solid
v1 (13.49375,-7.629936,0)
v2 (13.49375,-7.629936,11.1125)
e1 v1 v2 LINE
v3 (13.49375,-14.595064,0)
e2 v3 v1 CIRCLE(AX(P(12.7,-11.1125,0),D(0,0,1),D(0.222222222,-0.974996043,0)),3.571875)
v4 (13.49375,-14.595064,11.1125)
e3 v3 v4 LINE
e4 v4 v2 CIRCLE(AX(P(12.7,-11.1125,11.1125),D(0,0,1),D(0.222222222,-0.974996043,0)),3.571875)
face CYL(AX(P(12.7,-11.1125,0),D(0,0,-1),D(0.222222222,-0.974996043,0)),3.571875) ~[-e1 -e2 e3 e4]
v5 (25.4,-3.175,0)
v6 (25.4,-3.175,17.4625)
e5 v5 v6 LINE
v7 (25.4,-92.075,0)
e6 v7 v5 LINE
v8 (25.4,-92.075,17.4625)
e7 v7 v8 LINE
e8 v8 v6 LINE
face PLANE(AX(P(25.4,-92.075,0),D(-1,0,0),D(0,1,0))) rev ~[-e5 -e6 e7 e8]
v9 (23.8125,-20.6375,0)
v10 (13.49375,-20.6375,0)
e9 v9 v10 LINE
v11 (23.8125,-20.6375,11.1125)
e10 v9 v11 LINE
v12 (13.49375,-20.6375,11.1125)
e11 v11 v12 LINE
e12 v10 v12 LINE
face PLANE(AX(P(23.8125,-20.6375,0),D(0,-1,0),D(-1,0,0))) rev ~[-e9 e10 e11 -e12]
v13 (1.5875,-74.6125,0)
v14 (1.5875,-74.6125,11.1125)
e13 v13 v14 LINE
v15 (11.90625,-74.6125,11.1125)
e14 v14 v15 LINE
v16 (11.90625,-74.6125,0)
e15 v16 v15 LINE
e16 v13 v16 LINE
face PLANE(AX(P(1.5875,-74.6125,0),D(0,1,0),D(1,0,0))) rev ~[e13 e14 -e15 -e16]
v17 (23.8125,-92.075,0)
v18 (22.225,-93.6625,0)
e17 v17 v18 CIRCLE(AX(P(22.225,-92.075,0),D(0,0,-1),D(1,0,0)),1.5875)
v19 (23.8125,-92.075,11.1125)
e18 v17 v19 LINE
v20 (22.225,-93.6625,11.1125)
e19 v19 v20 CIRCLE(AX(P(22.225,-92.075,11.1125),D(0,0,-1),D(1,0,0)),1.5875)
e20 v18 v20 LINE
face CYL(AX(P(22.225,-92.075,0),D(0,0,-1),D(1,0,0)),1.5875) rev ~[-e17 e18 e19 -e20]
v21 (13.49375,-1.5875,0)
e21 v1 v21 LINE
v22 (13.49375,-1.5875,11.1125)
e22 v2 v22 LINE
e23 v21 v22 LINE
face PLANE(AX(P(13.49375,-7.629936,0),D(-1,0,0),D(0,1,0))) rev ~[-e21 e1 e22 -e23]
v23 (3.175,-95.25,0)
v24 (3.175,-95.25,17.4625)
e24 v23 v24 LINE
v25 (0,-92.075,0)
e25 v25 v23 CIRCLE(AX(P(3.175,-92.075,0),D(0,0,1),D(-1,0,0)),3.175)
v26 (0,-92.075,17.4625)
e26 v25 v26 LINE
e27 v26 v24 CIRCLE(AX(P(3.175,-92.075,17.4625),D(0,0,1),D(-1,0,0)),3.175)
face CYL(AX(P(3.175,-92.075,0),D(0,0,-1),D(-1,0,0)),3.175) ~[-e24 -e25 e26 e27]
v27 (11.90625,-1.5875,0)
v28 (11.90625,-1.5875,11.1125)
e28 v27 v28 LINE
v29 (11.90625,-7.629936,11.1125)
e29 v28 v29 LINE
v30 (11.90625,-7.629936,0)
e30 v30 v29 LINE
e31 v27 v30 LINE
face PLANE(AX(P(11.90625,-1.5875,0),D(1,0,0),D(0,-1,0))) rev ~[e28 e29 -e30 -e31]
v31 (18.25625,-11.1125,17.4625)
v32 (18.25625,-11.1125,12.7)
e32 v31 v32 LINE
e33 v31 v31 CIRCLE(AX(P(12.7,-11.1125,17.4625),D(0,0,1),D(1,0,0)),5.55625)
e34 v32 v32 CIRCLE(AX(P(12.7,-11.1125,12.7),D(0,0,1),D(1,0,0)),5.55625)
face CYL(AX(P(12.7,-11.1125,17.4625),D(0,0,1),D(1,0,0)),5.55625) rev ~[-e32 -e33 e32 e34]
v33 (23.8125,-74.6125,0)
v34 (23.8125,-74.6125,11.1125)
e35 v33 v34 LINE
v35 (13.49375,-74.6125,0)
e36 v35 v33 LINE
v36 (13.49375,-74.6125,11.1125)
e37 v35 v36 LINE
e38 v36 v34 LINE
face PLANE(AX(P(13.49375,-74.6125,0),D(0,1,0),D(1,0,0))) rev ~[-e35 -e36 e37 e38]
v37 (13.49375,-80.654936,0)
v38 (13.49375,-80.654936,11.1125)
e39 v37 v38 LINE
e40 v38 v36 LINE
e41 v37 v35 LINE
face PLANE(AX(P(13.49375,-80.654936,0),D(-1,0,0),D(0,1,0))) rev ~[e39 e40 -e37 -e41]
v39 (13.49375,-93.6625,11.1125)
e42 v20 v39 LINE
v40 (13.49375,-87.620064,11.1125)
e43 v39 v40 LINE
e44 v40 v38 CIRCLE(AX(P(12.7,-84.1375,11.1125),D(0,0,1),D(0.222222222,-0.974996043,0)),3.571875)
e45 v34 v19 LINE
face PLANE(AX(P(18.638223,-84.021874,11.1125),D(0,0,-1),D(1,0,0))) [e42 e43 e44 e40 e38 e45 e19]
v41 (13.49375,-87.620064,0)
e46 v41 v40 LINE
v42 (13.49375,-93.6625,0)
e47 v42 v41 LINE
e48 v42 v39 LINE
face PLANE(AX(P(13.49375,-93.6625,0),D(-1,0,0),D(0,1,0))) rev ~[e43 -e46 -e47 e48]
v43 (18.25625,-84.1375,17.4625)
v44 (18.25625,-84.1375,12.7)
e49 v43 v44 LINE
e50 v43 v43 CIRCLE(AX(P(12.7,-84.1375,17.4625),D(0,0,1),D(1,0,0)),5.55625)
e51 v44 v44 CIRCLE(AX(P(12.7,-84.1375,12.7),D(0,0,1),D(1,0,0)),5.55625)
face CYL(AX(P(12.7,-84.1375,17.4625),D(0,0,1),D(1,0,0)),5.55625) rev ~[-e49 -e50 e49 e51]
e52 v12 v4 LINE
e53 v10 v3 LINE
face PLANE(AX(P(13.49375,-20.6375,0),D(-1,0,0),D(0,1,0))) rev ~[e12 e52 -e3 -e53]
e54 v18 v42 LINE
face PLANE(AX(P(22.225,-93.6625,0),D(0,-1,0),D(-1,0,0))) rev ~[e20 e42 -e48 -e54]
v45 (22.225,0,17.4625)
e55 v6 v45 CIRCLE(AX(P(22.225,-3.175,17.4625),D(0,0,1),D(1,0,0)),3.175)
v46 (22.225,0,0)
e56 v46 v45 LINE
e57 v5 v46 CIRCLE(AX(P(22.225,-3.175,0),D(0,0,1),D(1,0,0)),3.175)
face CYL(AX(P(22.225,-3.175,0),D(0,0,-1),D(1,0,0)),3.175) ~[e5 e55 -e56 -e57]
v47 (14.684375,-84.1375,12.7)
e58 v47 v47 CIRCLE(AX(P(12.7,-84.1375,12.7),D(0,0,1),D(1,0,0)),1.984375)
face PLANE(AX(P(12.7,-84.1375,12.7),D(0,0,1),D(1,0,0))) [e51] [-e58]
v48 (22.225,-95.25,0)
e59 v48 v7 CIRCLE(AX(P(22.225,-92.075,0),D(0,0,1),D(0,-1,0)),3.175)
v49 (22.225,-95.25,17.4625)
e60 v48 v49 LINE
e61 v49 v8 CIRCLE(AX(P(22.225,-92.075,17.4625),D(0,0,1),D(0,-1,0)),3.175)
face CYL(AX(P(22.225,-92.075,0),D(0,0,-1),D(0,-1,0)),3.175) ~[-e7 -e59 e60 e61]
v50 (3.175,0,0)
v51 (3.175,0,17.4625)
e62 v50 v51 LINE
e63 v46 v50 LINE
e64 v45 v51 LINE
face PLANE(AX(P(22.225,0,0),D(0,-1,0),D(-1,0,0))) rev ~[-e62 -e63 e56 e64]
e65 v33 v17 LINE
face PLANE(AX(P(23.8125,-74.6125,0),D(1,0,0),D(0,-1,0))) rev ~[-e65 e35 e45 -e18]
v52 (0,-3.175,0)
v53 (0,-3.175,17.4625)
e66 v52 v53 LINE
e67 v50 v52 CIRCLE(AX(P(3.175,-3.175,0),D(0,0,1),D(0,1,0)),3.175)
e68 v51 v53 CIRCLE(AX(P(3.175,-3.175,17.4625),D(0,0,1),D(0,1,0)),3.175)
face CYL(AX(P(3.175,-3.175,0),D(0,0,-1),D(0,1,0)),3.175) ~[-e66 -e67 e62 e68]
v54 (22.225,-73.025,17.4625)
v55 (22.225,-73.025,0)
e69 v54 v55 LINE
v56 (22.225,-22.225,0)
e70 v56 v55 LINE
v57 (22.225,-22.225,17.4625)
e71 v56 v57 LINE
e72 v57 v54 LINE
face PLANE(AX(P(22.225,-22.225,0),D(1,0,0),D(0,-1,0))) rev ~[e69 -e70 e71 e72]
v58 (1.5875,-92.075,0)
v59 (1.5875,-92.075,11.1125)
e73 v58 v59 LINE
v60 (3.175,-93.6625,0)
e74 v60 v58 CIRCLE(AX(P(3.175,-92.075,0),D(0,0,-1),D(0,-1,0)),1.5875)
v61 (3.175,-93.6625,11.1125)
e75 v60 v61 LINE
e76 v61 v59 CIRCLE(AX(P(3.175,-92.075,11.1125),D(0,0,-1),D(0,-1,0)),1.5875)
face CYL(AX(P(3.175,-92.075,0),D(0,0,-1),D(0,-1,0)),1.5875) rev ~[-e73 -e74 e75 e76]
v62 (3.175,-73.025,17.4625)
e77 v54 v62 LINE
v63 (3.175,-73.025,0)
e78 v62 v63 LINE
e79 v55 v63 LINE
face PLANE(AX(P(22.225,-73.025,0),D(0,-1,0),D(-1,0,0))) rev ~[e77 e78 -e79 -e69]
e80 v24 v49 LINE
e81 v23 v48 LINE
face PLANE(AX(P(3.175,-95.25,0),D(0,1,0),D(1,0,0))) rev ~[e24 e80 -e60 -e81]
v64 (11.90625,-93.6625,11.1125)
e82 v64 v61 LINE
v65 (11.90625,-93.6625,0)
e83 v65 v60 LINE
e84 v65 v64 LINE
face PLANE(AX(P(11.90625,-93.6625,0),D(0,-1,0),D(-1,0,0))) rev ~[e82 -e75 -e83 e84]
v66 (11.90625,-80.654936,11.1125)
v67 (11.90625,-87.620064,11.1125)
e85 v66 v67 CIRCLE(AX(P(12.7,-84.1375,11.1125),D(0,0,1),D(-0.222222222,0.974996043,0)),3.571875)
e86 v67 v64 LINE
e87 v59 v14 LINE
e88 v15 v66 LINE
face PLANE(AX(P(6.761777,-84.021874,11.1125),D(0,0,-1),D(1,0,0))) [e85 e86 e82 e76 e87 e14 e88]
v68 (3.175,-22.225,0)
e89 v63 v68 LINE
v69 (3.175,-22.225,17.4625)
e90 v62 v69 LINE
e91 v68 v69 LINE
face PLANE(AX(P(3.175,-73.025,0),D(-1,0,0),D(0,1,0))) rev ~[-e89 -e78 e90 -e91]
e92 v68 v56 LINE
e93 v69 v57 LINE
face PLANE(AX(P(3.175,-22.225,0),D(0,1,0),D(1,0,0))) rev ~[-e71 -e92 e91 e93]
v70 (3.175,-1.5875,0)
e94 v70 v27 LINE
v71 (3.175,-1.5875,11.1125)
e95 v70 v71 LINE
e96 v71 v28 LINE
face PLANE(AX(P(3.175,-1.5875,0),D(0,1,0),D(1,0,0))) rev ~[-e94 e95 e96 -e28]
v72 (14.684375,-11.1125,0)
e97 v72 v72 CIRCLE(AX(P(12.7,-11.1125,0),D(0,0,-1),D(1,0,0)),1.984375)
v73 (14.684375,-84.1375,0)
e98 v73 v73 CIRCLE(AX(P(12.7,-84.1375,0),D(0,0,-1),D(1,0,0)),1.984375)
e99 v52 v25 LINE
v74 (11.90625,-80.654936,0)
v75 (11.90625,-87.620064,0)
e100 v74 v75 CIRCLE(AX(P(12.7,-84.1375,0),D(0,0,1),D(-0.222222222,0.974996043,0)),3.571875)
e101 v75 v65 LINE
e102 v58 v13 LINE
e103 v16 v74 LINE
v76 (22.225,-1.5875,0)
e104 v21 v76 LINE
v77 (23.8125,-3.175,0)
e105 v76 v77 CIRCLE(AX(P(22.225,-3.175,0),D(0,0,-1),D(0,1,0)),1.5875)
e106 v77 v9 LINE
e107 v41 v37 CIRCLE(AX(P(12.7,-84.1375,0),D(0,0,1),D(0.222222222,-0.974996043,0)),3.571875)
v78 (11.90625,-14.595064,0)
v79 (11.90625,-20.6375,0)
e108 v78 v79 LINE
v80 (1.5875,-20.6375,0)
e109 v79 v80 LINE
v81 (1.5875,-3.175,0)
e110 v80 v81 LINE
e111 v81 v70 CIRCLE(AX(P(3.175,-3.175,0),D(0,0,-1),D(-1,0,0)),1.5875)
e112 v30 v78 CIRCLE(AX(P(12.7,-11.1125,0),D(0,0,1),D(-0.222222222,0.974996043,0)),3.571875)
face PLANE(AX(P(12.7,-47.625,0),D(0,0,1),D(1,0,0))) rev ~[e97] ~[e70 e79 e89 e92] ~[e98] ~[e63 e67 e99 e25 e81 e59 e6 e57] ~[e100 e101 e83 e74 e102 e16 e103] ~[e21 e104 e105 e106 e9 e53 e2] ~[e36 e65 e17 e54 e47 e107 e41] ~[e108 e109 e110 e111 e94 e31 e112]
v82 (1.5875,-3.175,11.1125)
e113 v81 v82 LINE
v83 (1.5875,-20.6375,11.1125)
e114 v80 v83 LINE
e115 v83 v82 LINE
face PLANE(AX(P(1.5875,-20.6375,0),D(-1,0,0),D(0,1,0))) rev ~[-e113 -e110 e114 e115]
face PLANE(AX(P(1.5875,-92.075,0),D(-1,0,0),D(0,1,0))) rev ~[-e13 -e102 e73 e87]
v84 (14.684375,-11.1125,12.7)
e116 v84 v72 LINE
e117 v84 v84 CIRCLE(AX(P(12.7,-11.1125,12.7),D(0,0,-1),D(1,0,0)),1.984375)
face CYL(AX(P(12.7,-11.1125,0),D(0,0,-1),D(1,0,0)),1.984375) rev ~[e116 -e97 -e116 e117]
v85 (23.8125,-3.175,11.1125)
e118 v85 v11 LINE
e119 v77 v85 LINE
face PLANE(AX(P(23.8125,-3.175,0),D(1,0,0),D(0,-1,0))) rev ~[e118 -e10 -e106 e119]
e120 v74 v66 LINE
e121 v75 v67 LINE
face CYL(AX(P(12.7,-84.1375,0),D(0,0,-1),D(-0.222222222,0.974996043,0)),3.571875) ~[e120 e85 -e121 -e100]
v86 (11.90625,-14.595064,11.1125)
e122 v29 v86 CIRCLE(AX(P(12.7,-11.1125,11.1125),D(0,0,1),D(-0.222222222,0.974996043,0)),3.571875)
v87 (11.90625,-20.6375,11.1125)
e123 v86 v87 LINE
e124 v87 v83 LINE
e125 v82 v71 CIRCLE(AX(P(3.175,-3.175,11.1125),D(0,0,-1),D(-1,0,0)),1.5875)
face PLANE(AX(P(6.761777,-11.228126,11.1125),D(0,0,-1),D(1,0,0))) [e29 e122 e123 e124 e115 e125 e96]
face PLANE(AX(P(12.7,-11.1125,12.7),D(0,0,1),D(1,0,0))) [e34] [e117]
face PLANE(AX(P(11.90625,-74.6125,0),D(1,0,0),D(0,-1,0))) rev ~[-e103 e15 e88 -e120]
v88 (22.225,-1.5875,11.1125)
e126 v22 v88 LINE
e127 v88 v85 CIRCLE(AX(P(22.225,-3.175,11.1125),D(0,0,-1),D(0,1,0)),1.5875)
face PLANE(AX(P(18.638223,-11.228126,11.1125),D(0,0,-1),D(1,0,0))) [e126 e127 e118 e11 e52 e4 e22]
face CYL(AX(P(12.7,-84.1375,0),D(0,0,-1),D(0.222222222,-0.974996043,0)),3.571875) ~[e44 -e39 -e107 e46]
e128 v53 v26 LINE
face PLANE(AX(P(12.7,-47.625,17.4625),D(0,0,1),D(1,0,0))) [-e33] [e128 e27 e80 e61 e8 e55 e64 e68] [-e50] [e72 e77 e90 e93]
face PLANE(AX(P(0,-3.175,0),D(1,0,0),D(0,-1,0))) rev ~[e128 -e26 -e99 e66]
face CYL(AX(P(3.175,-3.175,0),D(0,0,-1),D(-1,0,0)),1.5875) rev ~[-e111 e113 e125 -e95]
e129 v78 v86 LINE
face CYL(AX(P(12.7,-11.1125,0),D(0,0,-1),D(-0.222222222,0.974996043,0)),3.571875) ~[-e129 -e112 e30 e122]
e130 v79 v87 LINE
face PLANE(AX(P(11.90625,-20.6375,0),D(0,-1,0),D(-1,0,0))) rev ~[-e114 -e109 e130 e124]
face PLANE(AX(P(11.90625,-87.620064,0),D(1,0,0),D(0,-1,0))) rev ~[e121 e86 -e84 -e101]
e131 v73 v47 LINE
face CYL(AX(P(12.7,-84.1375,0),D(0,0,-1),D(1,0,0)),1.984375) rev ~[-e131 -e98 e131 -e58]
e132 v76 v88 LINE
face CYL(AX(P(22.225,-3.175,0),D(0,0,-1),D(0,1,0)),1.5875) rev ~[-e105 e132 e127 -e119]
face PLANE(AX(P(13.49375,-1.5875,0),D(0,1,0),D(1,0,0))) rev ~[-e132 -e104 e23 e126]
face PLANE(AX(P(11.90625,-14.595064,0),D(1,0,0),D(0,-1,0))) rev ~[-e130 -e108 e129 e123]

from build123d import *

# Parameters (mm, degrees)
F1_DEPTH = 17.4625
F3_R     = 1.984375
F4_DEPTH = 17.4635
F5_DEPTH = 3.175
F6_R     = 1.984375
F7_DEPTH = 11.1125
F8_R     = 5.55625
F8_R_2   = 1.984375
F9_DEPTH = 4.7625


with BuildPart() as f1:
    # F0 (on Top) → F1 (new body)
    with BuildSketch(Plane.XY):
        with BuildLine():
            Line((22.225, 0), (3.175, 0))
            ThreePointArc((3.175, 0), (0.9299359697, -0.9299359697), (0, -3.175))
            Line((0, -3.175), (0, -92.075))
            ThreePointArc((0, -92.075), (0.9299359697, -94.3200640303), (3.175, -95.25))
            Line((3.175, -95.25), (22.225, -95.25))
            ThreePointArc((22.225, -95.25), (24.4700640303, -94.3200640303), (25.4, -92.075))
            Line((25.4, -92.075), (25.4, -3.175))
            ThreePointArc((25.4, -3.175), (24.4700640303, -0.9299359697), (22.225, 0))
        make_face()
        Polygon((3.175, -22.225), (12.7, -22.225), (22.225, -22.225), (22.225, -47.625), (22.225, -73.025), (12.7, -73.025), (3.175, -73.025), (3.175, -47.625), align=None, mode=Mode.SUBTRACT)
    extrude(amount=F1_DEPTH)

    # F3 (on face) → F4 (cut, through all)
    with BuildSketch(Plane(origin=(0, 0, 0), x_dir=(1, 0, 0), z_dir=(0, 0, -1))):
        with Locations((12.7, 11.1125)):
            Circle(F3_R)
        with Locations((12.7, 84.1375)):
            Circle(F3_R)
    extrude(amount=-F4_DEPTH, mode=Mode.SUBTRACT)

    # F0 (on Top) → F5 (cut)
    with BuildSketch(Plane.XY):
        Polygon((22.225, -22.225), (12.7, -22.225), (3.175, -22.225), (3.175, -47.625), (3.175, -73.025), (12.7, -73.025), (22.225, -73.025), (22.225, -47.625), align=None)
    extrude(amount=F5_DEPTH, mode=Mode.SUBTRACT)

    # F6 (on face) → F7 (cut)
    with BuildSketch(Plane(origin=(0, 0, 0), x_dir=(1, 0, 0), z_dir=(0, 0, -1))):
        with BuildLine():
            ThreePointArc((11.90625, 80.6549360088), (9.128125, 84.1375), (11.90625, 87.6200639912))
            Line((11.90625, 87.6200639912), (11.90625, 93.6625))
            Line((11.90625, 93.6625), (3.175, 93.6625))
            ThreePointArc((3.175, 93.6625), (2.0524679849, 93.1975320151), (1.5875, 92.075))
            Line((1.5875, 92.075), (1.5875, 74.6125))
            Line((1.5875, 74.6125), (11.90625, 74.6125))
            Line((11.90625, 74.6125), (11.90625, 80.6549360088))
        make_face()
        with BuildLine():
            Line((22.225, 93.6625), (13.49375, 93.6625))
            Line((13.49375, 93.6625), (13.49375, 87.6200639912))
            ThreePointArc((13.49375, 87.6200639912), (16.271875, 84.1375), (13.49375, 80.6549360088))
            Line((13.49375, 80.6549360088), (13.49375, 74.6125))
            Line((13.49375, 74.6125), (23.8125, 74.6125))
            Line((23.8125, 74.6125), (23.8125, 92.075))
            ThreePointArc((23.8125, 92.075), (23.3475320151, 93.1975320151), (22.225, 93.6625))
        make_face()
        with BuildLine():
            Line((11.90625, 20.6375), (1.5875, 20.6375))
            Line((1.5875, 20.6375), (1.5875, 3.175))
            ThreePointArc((1.5875, 3.175), (2.0524679849, 2.0524679849), (3.175, 1.5875))
            Line((3.175, 1.5875), (11.90625, 1.5875))
            Line((11.90625, 1.5875), (11.90625, 7.6299360088))
            ThreePointArc((11.90625, 7.6299360088), (9.128125, 11.1125), (11.90625, 14.5950639912))
            Line((11.90625, 14.5950639912), (11.90625, 20.6375))
        make_face()
        with BuildLine():
            Line((23.8125, 3.175), (23.8125, 20.6375))
            Line((23.8125, 20.6375), (13.49375, 20.6375))
            Line((13.49375, 20.6375), (13.49375, 14.5950639912))
            ThreePointArc((13.49375, 14.5950639912), (16.271875, 11.1125), (13.49375, 7.6299360088))
            Line((13.49375, 7.6299360088), (13.49375, 1.5875))
            Line((13.49375, 1.5875), (22.225, 1.5875))
            ThreePointArc((22.225, 1.5875), (23.3475320151, 2.0524679849), (23.8125, 3.175))
        make_face()
        with Locations((12.7, 11.1125)):
            Circle(F6_R)
    extrude(amount=-F7_DEPTH, mode=Mode.SUBTRACT)

    # F8 (on face) → F9 (cut)
    with BuildSketch(Plane.XY.offset(17.4625)):
        with Locations((12.7, -84.1375)):
            Circle(F8_R)
        with Locations((12.7, -84.1375)):
            Circle(F8_R_2, mode=Mode.SUBTRACT)
        with Locations((12.7, -11.1125)):
            Circle(F8_R)
        with Locations((12.7, -11.1125)):
            Circle(F8_R_2, mode=Mode.SUBTRACT)
        with Locations((12.7, -11.1125)):
            Circle(F8_R_2)
    extrude(amount=-F9_DEPTH, mode=Mode.SUBTRACT)


solid = f1.part
